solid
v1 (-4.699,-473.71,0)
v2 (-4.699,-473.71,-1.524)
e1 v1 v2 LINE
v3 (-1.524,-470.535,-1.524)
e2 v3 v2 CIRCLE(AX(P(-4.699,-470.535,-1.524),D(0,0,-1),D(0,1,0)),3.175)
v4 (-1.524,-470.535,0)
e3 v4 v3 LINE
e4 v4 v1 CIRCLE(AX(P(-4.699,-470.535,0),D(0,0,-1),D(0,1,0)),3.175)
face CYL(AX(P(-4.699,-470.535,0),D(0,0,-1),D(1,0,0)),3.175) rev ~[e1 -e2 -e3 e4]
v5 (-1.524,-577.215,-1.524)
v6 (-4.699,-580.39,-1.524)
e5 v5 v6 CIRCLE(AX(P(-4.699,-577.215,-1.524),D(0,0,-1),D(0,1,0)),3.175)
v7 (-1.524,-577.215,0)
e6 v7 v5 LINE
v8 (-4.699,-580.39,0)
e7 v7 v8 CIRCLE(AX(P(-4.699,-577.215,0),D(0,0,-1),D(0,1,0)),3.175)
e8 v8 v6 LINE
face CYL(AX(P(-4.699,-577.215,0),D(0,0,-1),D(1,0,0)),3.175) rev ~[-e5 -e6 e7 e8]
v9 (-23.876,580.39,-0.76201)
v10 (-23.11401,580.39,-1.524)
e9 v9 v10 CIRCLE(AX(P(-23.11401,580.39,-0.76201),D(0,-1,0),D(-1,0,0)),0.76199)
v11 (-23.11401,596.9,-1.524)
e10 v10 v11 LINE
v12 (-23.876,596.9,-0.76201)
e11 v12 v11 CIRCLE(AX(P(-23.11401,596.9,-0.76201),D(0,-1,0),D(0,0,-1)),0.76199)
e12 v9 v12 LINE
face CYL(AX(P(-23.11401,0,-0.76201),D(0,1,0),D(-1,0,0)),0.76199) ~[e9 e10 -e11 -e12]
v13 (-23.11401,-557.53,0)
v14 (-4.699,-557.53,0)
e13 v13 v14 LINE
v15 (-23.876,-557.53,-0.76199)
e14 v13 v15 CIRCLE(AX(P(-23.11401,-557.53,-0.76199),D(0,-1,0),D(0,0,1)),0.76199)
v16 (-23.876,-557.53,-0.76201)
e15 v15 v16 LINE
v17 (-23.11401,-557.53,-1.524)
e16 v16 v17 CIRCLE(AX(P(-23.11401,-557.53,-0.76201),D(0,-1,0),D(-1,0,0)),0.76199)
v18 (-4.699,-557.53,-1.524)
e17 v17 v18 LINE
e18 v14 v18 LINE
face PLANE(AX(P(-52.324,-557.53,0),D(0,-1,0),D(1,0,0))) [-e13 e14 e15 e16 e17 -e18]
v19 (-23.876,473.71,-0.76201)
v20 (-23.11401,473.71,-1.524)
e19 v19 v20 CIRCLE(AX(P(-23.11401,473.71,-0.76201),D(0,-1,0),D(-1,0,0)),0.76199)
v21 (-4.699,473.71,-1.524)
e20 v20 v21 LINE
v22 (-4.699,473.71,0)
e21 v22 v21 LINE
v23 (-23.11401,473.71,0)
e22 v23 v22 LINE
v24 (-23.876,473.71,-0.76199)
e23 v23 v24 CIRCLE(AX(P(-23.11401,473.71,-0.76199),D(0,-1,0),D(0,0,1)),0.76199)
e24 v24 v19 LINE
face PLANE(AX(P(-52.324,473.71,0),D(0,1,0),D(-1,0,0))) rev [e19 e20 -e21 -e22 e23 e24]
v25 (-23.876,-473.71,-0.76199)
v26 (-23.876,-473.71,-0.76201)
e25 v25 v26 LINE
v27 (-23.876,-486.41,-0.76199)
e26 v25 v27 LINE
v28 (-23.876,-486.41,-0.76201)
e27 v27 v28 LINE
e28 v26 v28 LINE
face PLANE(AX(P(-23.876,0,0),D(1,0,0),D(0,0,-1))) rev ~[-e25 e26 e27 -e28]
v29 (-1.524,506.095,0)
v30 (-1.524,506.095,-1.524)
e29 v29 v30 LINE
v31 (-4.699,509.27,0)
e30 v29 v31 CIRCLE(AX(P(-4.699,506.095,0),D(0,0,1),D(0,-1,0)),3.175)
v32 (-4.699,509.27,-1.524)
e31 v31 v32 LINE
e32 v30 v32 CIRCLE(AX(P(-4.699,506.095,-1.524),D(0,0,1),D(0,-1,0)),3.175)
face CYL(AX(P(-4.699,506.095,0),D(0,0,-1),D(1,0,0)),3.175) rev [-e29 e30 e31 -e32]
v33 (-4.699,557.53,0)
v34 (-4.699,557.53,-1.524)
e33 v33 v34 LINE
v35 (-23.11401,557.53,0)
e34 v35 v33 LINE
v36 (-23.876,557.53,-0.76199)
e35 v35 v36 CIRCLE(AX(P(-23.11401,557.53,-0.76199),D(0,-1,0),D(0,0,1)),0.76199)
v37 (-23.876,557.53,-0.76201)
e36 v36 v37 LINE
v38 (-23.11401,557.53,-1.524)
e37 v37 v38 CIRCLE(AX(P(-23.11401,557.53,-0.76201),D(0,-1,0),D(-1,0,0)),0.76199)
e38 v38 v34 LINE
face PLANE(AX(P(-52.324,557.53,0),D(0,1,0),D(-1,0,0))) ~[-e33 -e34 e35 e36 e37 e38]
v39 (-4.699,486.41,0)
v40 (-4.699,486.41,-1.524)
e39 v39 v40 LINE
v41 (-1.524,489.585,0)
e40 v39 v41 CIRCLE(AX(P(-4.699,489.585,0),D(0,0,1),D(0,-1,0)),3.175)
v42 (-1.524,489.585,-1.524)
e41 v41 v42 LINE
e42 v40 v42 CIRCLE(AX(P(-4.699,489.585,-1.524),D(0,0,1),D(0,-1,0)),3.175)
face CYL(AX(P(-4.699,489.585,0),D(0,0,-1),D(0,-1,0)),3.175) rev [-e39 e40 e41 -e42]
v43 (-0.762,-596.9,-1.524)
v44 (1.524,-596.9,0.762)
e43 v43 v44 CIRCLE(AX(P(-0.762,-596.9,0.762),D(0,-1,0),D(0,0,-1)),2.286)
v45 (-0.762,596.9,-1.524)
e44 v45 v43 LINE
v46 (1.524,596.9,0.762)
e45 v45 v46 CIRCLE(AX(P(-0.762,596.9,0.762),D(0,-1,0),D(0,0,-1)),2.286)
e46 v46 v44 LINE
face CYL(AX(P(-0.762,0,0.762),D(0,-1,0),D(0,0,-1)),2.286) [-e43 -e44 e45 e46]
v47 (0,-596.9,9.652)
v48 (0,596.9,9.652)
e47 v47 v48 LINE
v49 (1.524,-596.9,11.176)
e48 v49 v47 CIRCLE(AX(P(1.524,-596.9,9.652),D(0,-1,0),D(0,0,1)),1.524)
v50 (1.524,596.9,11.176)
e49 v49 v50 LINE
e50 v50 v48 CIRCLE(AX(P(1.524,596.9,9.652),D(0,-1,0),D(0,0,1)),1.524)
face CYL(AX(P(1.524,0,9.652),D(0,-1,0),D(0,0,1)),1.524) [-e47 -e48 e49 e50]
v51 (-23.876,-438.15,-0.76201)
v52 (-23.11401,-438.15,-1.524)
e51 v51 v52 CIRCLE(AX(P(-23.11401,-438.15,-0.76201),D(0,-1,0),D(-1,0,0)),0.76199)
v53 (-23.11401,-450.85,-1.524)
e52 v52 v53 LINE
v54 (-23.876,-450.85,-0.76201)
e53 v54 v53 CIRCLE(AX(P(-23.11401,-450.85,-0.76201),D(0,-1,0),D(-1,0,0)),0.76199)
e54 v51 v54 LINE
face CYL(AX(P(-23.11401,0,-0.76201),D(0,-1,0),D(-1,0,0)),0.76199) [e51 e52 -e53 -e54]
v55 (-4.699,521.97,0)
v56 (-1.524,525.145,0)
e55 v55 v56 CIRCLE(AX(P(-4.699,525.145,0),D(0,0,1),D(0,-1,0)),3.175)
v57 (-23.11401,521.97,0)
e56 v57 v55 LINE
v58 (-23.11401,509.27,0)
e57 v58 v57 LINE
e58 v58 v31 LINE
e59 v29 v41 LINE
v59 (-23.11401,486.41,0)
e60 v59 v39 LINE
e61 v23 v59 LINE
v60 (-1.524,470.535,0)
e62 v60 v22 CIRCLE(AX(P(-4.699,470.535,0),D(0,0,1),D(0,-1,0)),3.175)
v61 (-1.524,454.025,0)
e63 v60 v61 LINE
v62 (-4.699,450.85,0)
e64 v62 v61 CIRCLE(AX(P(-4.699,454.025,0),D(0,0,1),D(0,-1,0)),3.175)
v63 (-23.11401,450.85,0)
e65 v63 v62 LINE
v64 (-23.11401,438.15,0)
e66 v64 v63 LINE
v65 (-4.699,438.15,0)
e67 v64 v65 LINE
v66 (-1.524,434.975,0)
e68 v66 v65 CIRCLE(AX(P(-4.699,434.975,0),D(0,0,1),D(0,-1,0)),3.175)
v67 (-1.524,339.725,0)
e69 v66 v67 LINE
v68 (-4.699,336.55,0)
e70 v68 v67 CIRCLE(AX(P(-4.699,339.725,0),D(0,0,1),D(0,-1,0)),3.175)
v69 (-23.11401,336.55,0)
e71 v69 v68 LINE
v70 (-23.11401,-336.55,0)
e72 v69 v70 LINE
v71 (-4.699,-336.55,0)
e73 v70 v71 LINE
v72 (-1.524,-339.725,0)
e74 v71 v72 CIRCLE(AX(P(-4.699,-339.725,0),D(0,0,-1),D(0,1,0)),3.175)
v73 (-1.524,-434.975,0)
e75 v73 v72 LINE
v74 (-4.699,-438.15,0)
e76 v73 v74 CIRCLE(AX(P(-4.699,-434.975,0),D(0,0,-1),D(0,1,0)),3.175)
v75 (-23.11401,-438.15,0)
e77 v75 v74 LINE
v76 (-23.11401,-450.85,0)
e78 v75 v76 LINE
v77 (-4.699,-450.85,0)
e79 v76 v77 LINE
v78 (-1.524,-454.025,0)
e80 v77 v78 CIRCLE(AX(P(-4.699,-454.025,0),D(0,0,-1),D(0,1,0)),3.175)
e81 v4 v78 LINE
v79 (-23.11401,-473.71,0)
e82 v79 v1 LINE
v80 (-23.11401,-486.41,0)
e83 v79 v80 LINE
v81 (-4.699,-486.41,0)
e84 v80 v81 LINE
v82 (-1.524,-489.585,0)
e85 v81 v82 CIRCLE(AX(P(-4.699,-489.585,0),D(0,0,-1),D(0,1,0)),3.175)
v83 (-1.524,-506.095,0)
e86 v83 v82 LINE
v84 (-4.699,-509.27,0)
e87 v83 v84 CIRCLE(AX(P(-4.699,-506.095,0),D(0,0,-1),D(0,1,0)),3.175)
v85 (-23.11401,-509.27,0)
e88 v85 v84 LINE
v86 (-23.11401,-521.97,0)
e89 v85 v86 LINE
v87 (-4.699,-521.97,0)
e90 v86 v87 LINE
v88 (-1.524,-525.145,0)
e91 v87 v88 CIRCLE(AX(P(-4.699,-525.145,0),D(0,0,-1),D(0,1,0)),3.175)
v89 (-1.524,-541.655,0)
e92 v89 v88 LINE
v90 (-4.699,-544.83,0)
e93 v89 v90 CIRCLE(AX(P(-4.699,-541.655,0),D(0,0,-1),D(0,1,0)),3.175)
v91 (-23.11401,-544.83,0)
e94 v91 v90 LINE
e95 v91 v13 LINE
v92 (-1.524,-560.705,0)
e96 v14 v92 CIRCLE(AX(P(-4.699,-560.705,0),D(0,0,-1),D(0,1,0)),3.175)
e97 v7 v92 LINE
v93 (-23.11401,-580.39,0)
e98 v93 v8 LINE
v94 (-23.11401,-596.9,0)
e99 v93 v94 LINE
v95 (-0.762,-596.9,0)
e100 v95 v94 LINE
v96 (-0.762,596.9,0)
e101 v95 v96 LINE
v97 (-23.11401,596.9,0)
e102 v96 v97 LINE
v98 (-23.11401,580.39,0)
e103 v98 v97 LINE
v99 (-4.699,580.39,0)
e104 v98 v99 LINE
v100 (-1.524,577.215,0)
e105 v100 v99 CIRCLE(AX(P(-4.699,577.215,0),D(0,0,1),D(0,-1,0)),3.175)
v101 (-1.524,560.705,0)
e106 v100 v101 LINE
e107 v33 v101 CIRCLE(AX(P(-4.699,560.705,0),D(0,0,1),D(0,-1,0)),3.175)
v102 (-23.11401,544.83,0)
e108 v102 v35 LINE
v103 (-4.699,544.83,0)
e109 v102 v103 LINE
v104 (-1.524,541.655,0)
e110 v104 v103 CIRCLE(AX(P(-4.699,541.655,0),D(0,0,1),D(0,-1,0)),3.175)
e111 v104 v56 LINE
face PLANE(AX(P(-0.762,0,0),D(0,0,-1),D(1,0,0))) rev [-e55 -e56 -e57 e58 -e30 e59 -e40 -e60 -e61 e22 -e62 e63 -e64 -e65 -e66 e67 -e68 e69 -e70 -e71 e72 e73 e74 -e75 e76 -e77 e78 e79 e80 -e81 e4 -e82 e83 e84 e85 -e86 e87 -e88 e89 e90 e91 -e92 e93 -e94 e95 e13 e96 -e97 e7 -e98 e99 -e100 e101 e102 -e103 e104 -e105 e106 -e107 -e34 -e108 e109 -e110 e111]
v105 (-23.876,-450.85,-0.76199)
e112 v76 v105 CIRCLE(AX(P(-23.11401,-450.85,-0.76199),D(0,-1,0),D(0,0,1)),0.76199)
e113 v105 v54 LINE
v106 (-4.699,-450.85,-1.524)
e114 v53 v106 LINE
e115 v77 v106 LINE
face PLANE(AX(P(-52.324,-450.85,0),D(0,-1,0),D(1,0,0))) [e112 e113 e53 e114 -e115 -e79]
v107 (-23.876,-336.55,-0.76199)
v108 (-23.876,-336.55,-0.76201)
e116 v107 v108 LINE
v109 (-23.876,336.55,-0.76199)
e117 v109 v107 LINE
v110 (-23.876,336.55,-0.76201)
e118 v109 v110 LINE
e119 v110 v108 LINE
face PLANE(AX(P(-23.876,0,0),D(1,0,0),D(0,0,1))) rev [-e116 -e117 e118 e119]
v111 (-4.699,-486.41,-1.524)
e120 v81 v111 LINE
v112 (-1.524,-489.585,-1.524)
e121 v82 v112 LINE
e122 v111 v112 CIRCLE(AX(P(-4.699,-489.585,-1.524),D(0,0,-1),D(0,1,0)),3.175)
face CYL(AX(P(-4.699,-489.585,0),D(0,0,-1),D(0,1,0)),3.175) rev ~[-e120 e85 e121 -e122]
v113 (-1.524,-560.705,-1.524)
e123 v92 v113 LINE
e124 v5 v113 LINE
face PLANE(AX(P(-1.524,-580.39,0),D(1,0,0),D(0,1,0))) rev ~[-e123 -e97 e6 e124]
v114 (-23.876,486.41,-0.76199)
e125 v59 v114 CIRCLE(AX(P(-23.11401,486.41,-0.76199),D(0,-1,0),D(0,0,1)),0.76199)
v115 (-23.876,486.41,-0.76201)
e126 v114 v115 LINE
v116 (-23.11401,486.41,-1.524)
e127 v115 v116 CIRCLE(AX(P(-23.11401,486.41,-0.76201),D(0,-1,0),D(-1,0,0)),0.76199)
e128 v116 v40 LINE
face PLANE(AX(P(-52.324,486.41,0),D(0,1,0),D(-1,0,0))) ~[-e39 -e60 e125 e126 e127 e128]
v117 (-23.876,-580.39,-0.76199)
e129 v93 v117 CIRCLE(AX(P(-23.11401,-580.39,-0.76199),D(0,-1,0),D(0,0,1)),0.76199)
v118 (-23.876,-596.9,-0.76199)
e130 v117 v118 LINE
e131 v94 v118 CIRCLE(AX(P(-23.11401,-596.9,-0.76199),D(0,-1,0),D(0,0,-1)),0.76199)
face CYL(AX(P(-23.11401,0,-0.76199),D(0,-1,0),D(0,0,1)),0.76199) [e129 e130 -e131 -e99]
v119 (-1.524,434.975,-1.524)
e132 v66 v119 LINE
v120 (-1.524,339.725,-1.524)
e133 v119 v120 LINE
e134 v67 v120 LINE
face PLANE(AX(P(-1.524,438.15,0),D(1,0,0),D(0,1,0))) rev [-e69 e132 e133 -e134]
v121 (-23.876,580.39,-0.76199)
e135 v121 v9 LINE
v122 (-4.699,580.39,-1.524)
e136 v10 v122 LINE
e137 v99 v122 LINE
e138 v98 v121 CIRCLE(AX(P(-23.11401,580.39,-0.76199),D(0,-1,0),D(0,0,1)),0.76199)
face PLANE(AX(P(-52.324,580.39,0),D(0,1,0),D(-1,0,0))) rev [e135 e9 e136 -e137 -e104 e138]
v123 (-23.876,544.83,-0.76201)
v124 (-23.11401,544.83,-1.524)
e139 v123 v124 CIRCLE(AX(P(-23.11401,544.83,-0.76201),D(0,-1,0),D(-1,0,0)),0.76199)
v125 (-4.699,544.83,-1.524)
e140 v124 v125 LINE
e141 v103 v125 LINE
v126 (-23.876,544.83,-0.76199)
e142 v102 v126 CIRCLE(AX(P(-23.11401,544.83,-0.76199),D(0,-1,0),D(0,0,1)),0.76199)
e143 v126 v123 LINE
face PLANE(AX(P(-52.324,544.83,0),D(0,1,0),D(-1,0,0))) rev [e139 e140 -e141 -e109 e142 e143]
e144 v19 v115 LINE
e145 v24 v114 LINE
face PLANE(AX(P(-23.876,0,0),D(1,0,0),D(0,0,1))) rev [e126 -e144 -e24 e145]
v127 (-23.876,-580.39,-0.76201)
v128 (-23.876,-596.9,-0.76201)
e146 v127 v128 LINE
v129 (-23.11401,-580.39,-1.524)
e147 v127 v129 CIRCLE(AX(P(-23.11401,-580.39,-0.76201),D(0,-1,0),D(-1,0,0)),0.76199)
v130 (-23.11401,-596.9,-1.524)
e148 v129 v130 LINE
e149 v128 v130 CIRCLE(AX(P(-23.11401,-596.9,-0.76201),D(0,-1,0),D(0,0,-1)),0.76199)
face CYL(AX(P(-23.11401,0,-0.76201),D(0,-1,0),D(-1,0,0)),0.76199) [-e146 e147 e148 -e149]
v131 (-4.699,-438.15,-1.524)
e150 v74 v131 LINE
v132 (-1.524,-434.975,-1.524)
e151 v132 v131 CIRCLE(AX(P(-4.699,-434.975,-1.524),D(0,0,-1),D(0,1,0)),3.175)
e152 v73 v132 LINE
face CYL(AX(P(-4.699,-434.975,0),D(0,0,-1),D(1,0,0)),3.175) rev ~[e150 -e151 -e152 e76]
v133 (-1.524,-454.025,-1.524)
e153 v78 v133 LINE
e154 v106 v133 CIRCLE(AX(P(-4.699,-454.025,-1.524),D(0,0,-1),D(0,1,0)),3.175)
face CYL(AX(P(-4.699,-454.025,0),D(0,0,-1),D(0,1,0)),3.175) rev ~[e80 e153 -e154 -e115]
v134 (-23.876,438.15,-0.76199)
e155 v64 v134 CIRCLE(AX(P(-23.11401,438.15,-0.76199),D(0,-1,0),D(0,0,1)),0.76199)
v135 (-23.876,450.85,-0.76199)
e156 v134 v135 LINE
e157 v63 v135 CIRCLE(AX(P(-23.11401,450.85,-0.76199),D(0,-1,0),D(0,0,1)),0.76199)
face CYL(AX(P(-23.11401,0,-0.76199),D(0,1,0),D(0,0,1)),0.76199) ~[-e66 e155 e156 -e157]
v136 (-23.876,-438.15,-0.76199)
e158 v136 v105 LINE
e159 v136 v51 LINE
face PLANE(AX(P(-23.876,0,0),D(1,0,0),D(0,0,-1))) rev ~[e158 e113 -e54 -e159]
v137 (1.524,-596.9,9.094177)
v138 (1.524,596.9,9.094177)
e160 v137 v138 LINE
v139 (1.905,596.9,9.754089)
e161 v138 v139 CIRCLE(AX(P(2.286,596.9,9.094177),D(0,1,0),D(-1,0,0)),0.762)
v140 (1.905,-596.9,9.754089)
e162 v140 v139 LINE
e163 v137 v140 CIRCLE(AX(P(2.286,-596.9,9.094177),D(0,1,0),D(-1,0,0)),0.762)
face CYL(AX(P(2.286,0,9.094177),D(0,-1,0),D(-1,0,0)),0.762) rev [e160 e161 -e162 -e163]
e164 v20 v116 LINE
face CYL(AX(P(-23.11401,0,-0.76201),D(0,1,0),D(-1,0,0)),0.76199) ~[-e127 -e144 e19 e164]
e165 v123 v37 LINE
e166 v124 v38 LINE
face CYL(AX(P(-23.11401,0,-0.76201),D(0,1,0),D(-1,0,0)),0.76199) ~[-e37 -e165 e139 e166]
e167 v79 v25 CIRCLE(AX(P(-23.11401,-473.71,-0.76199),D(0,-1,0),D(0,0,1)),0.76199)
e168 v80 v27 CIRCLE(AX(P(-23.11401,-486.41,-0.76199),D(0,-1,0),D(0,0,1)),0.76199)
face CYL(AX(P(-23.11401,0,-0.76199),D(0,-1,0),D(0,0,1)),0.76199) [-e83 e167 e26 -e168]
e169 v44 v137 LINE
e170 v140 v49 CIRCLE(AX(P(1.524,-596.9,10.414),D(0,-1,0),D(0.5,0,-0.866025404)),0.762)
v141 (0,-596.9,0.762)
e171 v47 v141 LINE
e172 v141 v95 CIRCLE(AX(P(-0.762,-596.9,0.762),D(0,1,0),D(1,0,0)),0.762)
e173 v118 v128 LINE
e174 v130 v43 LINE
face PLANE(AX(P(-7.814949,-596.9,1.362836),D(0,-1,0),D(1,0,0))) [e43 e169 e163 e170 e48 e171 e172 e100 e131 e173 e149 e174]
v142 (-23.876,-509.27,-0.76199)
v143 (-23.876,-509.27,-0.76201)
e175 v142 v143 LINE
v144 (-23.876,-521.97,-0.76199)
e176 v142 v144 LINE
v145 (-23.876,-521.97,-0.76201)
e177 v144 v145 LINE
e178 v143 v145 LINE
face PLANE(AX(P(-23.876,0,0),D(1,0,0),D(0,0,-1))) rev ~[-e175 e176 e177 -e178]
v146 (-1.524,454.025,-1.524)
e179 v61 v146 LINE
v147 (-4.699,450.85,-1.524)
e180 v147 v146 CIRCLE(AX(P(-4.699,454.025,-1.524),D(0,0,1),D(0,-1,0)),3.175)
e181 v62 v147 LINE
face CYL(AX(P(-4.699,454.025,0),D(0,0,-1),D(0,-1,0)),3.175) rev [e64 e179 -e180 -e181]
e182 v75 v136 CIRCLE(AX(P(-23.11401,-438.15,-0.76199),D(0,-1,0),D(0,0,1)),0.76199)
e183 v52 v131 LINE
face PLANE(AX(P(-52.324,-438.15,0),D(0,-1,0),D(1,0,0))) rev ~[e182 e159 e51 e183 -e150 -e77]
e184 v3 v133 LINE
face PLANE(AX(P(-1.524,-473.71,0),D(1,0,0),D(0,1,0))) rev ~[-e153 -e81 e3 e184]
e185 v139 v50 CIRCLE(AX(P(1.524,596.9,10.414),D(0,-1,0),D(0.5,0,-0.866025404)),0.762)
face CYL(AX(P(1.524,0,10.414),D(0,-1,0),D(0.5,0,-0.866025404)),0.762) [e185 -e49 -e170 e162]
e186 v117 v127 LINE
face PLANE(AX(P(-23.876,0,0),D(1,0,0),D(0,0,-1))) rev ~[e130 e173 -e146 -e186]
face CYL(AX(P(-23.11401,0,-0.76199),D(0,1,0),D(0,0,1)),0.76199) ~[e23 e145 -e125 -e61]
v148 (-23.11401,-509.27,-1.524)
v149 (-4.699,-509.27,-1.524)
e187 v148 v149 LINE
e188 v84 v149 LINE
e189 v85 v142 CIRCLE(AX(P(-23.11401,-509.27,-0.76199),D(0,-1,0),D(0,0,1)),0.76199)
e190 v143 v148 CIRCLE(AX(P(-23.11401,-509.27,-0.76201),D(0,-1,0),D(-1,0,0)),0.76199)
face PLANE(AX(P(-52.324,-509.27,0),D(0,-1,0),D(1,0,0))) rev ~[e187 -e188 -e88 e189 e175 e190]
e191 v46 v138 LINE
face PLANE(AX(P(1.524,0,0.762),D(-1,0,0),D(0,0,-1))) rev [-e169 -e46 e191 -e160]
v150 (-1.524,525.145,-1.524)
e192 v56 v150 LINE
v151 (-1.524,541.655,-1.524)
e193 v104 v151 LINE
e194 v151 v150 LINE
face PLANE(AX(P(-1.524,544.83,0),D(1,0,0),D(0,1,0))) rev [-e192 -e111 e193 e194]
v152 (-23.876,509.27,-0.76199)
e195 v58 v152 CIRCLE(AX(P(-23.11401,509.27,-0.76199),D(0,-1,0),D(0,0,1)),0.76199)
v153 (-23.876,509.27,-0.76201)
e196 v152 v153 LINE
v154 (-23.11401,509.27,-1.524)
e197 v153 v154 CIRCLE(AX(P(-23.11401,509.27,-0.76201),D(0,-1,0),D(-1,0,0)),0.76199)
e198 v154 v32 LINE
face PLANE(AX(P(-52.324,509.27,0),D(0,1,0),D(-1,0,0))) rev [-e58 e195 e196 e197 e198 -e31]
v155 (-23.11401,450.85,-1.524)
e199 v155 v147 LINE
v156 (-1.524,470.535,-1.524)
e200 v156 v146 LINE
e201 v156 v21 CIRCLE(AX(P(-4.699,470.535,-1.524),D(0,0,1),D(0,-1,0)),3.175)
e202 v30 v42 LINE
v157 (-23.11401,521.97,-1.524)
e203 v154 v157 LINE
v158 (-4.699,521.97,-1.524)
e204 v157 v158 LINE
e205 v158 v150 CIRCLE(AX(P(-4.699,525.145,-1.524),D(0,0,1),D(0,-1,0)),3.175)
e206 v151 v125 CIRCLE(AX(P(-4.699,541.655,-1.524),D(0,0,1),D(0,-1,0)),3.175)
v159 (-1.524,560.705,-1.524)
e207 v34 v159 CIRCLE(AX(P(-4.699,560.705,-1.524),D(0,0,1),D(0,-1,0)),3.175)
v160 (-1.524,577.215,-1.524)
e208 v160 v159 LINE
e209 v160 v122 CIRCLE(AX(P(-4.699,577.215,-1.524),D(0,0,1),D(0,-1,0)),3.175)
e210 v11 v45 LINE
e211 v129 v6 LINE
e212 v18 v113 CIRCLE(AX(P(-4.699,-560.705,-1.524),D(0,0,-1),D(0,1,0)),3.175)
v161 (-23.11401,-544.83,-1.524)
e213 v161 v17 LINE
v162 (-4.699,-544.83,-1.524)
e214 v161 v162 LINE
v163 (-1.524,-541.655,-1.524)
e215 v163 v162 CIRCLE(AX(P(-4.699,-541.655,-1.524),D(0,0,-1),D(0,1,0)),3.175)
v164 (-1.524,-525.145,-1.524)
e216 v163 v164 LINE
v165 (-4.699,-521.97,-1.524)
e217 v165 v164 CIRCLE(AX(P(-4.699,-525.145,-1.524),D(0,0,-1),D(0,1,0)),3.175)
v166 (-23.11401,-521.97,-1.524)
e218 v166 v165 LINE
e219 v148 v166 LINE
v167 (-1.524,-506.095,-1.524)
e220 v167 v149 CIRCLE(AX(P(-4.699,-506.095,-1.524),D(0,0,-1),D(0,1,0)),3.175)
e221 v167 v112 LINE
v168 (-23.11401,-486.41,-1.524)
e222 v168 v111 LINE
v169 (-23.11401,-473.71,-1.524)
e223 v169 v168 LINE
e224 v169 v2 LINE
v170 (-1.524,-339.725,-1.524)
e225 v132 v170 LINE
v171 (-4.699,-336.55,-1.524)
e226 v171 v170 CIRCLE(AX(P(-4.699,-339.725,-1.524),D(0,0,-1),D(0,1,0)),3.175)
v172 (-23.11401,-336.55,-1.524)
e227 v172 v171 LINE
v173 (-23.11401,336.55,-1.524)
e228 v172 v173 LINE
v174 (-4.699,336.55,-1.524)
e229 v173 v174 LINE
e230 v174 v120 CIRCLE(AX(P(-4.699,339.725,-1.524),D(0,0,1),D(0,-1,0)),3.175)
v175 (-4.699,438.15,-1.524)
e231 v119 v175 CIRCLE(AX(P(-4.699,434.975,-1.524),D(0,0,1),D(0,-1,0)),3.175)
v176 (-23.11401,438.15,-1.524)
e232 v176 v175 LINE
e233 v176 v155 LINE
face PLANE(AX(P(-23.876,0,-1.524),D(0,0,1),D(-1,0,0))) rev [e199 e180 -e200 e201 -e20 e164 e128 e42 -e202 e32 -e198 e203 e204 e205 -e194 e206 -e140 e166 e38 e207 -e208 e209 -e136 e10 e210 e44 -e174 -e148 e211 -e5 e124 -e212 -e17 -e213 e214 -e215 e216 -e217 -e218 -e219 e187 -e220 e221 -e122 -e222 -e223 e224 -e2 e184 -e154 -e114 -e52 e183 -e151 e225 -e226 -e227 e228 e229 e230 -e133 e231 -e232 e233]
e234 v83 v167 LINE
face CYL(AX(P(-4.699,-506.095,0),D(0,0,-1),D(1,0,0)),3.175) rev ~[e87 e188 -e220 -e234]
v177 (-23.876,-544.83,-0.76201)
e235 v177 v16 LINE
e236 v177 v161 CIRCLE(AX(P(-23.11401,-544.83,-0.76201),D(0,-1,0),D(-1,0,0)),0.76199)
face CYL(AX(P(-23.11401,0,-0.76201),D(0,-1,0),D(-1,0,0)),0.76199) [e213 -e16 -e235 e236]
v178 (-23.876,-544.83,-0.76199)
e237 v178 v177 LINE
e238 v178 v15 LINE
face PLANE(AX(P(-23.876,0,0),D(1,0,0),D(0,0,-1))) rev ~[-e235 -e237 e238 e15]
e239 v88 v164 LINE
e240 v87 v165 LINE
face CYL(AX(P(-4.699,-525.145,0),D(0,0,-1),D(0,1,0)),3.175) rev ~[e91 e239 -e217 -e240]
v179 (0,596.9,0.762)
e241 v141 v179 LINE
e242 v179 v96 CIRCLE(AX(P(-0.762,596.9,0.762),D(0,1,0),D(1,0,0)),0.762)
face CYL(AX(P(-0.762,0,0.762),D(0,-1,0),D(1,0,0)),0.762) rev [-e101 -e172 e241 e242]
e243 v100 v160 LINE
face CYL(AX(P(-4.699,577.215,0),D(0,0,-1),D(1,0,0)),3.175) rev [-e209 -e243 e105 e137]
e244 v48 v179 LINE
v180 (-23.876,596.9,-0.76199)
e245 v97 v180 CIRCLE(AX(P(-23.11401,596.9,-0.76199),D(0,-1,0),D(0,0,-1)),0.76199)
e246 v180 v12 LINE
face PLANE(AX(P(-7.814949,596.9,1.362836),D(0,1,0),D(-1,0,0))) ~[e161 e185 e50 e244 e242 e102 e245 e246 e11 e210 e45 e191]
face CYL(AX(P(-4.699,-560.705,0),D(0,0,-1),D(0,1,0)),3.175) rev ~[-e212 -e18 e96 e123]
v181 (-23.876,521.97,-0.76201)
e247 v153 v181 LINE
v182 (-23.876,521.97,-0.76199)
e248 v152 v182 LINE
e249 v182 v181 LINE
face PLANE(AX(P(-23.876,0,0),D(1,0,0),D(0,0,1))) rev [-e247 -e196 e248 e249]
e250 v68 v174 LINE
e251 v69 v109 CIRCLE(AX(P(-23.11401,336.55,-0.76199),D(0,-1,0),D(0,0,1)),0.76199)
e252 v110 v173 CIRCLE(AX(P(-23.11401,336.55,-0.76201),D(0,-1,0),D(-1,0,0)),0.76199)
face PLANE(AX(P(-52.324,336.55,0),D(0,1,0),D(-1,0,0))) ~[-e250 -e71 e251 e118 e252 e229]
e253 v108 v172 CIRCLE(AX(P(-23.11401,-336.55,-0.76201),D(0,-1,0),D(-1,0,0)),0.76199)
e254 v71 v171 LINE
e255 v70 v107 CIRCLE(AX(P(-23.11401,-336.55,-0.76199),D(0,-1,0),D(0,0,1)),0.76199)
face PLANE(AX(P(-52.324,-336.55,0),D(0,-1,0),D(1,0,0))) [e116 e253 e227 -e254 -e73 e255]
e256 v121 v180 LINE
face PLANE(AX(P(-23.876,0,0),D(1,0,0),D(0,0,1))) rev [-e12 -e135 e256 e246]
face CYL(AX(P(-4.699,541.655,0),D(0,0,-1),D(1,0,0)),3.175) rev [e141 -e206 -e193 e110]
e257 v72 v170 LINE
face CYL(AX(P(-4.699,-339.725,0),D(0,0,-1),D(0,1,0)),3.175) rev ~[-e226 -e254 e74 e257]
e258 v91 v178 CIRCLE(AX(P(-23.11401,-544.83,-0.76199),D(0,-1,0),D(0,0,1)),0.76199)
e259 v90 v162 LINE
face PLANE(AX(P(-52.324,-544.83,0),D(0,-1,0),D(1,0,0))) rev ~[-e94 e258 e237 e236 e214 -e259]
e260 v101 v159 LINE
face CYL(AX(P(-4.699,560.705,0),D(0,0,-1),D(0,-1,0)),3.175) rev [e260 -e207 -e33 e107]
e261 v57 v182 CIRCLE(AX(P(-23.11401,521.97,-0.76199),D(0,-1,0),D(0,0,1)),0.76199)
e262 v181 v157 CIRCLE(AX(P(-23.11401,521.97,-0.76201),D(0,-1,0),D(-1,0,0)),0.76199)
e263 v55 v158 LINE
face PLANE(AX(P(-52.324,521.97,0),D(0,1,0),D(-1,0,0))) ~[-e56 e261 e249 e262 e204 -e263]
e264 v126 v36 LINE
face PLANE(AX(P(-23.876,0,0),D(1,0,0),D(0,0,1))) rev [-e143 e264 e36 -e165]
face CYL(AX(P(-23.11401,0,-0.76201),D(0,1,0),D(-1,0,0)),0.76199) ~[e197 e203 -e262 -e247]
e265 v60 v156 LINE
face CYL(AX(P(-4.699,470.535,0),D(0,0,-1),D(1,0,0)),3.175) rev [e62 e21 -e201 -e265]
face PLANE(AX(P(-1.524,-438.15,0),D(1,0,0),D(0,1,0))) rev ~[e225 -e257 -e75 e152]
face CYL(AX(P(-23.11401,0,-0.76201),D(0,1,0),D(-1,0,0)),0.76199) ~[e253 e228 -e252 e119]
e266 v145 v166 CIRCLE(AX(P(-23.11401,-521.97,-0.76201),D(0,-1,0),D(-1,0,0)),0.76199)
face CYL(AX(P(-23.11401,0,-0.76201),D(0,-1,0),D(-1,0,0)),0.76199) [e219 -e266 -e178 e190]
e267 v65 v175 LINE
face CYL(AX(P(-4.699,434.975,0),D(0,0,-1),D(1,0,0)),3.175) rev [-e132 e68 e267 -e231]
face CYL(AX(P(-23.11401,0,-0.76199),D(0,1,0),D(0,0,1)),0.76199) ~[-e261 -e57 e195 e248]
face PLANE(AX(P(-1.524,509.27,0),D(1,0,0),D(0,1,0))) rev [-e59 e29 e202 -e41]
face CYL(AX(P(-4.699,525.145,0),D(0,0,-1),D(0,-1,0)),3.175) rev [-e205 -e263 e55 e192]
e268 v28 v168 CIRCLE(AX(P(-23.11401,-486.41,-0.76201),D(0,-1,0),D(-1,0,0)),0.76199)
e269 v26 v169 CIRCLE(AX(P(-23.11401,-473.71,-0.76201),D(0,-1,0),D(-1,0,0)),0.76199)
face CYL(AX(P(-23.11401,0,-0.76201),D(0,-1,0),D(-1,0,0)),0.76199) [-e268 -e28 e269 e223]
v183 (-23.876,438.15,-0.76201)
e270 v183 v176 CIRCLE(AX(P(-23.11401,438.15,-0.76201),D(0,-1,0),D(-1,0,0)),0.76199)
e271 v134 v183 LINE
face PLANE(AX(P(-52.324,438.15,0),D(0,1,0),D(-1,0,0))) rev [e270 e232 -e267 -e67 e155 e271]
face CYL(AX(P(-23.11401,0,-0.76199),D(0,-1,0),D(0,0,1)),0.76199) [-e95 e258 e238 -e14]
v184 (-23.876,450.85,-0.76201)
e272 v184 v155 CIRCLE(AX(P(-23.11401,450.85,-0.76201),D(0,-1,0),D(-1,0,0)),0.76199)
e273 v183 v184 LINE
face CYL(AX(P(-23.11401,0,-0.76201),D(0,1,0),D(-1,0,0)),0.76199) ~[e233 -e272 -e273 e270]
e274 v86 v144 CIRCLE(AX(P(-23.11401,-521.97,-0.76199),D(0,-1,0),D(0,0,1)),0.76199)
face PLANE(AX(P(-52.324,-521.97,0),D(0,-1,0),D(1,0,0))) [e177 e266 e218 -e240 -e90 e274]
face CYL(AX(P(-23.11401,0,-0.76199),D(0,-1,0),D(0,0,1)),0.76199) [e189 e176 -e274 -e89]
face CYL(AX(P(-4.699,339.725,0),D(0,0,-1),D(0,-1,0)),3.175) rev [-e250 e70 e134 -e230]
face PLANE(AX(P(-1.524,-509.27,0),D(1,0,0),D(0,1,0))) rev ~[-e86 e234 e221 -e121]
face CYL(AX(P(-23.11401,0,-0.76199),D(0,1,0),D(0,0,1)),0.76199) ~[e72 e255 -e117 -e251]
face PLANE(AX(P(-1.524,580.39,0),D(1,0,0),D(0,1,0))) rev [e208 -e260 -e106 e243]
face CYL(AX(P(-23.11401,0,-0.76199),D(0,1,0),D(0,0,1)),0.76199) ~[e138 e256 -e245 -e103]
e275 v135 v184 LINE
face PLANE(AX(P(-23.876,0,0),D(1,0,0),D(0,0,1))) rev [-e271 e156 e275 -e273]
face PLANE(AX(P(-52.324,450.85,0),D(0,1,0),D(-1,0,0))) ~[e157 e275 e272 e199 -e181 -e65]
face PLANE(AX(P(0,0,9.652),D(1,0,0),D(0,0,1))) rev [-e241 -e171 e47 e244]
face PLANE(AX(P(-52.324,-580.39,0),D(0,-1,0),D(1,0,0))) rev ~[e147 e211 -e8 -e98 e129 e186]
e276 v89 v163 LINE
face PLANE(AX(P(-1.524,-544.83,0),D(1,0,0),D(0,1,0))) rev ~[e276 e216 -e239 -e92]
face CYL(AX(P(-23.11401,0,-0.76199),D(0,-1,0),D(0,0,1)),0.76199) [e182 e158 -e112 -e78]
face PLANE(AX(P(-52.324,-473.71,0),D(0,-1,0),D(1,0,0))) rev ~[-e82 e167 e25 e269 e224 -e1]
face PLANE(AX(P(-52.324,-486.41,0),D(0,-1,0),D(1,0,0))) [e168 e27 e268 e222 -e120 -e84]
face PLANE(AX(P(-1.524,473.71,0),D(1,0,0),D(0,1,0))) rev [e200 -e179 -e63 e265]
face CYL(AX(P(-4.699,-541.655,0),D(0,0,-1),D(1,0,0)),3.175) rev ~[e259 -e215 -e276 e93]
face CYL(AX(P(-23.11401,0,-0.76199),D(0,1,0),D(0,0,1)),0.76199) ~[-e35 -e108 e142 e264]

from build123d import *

# Parameters (mm, degrees)
F1_DEPTH = 596.9
F2_R     = 0.76199
F3_W     = 50.8
F3_H     = 101.6
F4_DEPTH = 1.525
F5_W     = 50.8
F5_H     = 22.86
F6_DEPTH = 1.525
F7_R     = 3.175


# Not quite as in the source:
# - a fillet or chamfer is up to 0.001 mm smaller than in the source, because OpenCascade refuses the exact size


with BuildPart() as f1:
    # F0 (on Front) → F1 (new body)
    with BuildSketch(Plane.XZ):
        with BuildLine():
            Line((1.524, 0.762), (1.524, 9.0941772846))
            ThreePointArc((1.524, 9.0941772846), (1.6260886423, 9.4751772846), (1.905, 9.7540886423))
            ThreePointArc((1.905, 9.7540886423), (2.2600354796, 10.6112201124), (1.524, 11.176))
            ThreePointArc((1.524, 11.176), (0.4463692655, 10.7296307345), (0, 9.652))
            Line((0, 9.652), (0, 0.762))
            ThreePointArc((0, 0.762), (-0.2231846327, 0.2231846327), (-0.762, 0))
            Line((-0.762, 0), (-23.876, 0))
            Line((-23.876, 0), (-23.876, -1.524))
            Line((-23.876, -1.524), (-0.762, -1.524))
            ThreePointArc((-0.762, -1.524), (0.8544461018, -0.8544461018), (1.524, 0.762))
        make_face()
    extrude(amount=F1_DEPTH)

    # F2 (radius 0.762 in the source; OpenCascade refuses exactly that, so slightly less here)
    f2_edges = [f1.edges().sort_by_distance(p)[0] for p in [
        (-23.876, -298.45, 0),
        (-23.876, -298.45, -1.524),
    ]]
    fillet(f2_edges, radius=F2_R)

    # F3 (on Top) → F4 (cut, through all)
    with BuildSketch(Plane.XY):
        with Locations((-26.924, -387.35)):
            Rectangle(F3_W, F3_H)
    extrude(amount=-F4_DEPTH, mode=Mode.SUBTRACT)

    # F5 (on Top) → F6 (cut, through all)
    with BuildSketch(Plane.XY):
        with Locations((-26.924, -462.28)):
            Rectangle(F5_W, F5_H)
        with Locations((-26.924, -497.84)):
            Rectangle(F5_W, F5_H)
        with Locations((-26.924, -533.4)):
            Rectangle(F5_W, F5_H)
        with Locations((-26.924, -568.96)):
            Rectangle(F5_W, F5_H)
    extrude(amount=-F6_DEPTH, mode=Mode.SUBTRACT)

    # F7
    f7_edges = [f1.edges().sort_by_distance(p)[0] for p in [
        (-1.524, -336.55, -0.762),
        (-1.524, -438.15, -0.762),
        (-1.524, -450.85, -0.762),
        (-1.524, -473.71, -0.762),
        (-1.524, -509.27, -0.762),
        (-1.524, -544.83, -0.762),
        (-1.524, -580.39, -0.762),
        (-1.524, -486.41, -0.762),
        (-1.524, -521.97, -0.762),
        (-1.524, -557.53, -0.762),
    ]]
    fillet(f7_edges, radius=F7_R)

    # F8: F1 across plane


with BuildPart() as f1_1:
    add(f1.part)
    add(f1.part.mirror(Plane.XZ))


solid = f1_1.part
